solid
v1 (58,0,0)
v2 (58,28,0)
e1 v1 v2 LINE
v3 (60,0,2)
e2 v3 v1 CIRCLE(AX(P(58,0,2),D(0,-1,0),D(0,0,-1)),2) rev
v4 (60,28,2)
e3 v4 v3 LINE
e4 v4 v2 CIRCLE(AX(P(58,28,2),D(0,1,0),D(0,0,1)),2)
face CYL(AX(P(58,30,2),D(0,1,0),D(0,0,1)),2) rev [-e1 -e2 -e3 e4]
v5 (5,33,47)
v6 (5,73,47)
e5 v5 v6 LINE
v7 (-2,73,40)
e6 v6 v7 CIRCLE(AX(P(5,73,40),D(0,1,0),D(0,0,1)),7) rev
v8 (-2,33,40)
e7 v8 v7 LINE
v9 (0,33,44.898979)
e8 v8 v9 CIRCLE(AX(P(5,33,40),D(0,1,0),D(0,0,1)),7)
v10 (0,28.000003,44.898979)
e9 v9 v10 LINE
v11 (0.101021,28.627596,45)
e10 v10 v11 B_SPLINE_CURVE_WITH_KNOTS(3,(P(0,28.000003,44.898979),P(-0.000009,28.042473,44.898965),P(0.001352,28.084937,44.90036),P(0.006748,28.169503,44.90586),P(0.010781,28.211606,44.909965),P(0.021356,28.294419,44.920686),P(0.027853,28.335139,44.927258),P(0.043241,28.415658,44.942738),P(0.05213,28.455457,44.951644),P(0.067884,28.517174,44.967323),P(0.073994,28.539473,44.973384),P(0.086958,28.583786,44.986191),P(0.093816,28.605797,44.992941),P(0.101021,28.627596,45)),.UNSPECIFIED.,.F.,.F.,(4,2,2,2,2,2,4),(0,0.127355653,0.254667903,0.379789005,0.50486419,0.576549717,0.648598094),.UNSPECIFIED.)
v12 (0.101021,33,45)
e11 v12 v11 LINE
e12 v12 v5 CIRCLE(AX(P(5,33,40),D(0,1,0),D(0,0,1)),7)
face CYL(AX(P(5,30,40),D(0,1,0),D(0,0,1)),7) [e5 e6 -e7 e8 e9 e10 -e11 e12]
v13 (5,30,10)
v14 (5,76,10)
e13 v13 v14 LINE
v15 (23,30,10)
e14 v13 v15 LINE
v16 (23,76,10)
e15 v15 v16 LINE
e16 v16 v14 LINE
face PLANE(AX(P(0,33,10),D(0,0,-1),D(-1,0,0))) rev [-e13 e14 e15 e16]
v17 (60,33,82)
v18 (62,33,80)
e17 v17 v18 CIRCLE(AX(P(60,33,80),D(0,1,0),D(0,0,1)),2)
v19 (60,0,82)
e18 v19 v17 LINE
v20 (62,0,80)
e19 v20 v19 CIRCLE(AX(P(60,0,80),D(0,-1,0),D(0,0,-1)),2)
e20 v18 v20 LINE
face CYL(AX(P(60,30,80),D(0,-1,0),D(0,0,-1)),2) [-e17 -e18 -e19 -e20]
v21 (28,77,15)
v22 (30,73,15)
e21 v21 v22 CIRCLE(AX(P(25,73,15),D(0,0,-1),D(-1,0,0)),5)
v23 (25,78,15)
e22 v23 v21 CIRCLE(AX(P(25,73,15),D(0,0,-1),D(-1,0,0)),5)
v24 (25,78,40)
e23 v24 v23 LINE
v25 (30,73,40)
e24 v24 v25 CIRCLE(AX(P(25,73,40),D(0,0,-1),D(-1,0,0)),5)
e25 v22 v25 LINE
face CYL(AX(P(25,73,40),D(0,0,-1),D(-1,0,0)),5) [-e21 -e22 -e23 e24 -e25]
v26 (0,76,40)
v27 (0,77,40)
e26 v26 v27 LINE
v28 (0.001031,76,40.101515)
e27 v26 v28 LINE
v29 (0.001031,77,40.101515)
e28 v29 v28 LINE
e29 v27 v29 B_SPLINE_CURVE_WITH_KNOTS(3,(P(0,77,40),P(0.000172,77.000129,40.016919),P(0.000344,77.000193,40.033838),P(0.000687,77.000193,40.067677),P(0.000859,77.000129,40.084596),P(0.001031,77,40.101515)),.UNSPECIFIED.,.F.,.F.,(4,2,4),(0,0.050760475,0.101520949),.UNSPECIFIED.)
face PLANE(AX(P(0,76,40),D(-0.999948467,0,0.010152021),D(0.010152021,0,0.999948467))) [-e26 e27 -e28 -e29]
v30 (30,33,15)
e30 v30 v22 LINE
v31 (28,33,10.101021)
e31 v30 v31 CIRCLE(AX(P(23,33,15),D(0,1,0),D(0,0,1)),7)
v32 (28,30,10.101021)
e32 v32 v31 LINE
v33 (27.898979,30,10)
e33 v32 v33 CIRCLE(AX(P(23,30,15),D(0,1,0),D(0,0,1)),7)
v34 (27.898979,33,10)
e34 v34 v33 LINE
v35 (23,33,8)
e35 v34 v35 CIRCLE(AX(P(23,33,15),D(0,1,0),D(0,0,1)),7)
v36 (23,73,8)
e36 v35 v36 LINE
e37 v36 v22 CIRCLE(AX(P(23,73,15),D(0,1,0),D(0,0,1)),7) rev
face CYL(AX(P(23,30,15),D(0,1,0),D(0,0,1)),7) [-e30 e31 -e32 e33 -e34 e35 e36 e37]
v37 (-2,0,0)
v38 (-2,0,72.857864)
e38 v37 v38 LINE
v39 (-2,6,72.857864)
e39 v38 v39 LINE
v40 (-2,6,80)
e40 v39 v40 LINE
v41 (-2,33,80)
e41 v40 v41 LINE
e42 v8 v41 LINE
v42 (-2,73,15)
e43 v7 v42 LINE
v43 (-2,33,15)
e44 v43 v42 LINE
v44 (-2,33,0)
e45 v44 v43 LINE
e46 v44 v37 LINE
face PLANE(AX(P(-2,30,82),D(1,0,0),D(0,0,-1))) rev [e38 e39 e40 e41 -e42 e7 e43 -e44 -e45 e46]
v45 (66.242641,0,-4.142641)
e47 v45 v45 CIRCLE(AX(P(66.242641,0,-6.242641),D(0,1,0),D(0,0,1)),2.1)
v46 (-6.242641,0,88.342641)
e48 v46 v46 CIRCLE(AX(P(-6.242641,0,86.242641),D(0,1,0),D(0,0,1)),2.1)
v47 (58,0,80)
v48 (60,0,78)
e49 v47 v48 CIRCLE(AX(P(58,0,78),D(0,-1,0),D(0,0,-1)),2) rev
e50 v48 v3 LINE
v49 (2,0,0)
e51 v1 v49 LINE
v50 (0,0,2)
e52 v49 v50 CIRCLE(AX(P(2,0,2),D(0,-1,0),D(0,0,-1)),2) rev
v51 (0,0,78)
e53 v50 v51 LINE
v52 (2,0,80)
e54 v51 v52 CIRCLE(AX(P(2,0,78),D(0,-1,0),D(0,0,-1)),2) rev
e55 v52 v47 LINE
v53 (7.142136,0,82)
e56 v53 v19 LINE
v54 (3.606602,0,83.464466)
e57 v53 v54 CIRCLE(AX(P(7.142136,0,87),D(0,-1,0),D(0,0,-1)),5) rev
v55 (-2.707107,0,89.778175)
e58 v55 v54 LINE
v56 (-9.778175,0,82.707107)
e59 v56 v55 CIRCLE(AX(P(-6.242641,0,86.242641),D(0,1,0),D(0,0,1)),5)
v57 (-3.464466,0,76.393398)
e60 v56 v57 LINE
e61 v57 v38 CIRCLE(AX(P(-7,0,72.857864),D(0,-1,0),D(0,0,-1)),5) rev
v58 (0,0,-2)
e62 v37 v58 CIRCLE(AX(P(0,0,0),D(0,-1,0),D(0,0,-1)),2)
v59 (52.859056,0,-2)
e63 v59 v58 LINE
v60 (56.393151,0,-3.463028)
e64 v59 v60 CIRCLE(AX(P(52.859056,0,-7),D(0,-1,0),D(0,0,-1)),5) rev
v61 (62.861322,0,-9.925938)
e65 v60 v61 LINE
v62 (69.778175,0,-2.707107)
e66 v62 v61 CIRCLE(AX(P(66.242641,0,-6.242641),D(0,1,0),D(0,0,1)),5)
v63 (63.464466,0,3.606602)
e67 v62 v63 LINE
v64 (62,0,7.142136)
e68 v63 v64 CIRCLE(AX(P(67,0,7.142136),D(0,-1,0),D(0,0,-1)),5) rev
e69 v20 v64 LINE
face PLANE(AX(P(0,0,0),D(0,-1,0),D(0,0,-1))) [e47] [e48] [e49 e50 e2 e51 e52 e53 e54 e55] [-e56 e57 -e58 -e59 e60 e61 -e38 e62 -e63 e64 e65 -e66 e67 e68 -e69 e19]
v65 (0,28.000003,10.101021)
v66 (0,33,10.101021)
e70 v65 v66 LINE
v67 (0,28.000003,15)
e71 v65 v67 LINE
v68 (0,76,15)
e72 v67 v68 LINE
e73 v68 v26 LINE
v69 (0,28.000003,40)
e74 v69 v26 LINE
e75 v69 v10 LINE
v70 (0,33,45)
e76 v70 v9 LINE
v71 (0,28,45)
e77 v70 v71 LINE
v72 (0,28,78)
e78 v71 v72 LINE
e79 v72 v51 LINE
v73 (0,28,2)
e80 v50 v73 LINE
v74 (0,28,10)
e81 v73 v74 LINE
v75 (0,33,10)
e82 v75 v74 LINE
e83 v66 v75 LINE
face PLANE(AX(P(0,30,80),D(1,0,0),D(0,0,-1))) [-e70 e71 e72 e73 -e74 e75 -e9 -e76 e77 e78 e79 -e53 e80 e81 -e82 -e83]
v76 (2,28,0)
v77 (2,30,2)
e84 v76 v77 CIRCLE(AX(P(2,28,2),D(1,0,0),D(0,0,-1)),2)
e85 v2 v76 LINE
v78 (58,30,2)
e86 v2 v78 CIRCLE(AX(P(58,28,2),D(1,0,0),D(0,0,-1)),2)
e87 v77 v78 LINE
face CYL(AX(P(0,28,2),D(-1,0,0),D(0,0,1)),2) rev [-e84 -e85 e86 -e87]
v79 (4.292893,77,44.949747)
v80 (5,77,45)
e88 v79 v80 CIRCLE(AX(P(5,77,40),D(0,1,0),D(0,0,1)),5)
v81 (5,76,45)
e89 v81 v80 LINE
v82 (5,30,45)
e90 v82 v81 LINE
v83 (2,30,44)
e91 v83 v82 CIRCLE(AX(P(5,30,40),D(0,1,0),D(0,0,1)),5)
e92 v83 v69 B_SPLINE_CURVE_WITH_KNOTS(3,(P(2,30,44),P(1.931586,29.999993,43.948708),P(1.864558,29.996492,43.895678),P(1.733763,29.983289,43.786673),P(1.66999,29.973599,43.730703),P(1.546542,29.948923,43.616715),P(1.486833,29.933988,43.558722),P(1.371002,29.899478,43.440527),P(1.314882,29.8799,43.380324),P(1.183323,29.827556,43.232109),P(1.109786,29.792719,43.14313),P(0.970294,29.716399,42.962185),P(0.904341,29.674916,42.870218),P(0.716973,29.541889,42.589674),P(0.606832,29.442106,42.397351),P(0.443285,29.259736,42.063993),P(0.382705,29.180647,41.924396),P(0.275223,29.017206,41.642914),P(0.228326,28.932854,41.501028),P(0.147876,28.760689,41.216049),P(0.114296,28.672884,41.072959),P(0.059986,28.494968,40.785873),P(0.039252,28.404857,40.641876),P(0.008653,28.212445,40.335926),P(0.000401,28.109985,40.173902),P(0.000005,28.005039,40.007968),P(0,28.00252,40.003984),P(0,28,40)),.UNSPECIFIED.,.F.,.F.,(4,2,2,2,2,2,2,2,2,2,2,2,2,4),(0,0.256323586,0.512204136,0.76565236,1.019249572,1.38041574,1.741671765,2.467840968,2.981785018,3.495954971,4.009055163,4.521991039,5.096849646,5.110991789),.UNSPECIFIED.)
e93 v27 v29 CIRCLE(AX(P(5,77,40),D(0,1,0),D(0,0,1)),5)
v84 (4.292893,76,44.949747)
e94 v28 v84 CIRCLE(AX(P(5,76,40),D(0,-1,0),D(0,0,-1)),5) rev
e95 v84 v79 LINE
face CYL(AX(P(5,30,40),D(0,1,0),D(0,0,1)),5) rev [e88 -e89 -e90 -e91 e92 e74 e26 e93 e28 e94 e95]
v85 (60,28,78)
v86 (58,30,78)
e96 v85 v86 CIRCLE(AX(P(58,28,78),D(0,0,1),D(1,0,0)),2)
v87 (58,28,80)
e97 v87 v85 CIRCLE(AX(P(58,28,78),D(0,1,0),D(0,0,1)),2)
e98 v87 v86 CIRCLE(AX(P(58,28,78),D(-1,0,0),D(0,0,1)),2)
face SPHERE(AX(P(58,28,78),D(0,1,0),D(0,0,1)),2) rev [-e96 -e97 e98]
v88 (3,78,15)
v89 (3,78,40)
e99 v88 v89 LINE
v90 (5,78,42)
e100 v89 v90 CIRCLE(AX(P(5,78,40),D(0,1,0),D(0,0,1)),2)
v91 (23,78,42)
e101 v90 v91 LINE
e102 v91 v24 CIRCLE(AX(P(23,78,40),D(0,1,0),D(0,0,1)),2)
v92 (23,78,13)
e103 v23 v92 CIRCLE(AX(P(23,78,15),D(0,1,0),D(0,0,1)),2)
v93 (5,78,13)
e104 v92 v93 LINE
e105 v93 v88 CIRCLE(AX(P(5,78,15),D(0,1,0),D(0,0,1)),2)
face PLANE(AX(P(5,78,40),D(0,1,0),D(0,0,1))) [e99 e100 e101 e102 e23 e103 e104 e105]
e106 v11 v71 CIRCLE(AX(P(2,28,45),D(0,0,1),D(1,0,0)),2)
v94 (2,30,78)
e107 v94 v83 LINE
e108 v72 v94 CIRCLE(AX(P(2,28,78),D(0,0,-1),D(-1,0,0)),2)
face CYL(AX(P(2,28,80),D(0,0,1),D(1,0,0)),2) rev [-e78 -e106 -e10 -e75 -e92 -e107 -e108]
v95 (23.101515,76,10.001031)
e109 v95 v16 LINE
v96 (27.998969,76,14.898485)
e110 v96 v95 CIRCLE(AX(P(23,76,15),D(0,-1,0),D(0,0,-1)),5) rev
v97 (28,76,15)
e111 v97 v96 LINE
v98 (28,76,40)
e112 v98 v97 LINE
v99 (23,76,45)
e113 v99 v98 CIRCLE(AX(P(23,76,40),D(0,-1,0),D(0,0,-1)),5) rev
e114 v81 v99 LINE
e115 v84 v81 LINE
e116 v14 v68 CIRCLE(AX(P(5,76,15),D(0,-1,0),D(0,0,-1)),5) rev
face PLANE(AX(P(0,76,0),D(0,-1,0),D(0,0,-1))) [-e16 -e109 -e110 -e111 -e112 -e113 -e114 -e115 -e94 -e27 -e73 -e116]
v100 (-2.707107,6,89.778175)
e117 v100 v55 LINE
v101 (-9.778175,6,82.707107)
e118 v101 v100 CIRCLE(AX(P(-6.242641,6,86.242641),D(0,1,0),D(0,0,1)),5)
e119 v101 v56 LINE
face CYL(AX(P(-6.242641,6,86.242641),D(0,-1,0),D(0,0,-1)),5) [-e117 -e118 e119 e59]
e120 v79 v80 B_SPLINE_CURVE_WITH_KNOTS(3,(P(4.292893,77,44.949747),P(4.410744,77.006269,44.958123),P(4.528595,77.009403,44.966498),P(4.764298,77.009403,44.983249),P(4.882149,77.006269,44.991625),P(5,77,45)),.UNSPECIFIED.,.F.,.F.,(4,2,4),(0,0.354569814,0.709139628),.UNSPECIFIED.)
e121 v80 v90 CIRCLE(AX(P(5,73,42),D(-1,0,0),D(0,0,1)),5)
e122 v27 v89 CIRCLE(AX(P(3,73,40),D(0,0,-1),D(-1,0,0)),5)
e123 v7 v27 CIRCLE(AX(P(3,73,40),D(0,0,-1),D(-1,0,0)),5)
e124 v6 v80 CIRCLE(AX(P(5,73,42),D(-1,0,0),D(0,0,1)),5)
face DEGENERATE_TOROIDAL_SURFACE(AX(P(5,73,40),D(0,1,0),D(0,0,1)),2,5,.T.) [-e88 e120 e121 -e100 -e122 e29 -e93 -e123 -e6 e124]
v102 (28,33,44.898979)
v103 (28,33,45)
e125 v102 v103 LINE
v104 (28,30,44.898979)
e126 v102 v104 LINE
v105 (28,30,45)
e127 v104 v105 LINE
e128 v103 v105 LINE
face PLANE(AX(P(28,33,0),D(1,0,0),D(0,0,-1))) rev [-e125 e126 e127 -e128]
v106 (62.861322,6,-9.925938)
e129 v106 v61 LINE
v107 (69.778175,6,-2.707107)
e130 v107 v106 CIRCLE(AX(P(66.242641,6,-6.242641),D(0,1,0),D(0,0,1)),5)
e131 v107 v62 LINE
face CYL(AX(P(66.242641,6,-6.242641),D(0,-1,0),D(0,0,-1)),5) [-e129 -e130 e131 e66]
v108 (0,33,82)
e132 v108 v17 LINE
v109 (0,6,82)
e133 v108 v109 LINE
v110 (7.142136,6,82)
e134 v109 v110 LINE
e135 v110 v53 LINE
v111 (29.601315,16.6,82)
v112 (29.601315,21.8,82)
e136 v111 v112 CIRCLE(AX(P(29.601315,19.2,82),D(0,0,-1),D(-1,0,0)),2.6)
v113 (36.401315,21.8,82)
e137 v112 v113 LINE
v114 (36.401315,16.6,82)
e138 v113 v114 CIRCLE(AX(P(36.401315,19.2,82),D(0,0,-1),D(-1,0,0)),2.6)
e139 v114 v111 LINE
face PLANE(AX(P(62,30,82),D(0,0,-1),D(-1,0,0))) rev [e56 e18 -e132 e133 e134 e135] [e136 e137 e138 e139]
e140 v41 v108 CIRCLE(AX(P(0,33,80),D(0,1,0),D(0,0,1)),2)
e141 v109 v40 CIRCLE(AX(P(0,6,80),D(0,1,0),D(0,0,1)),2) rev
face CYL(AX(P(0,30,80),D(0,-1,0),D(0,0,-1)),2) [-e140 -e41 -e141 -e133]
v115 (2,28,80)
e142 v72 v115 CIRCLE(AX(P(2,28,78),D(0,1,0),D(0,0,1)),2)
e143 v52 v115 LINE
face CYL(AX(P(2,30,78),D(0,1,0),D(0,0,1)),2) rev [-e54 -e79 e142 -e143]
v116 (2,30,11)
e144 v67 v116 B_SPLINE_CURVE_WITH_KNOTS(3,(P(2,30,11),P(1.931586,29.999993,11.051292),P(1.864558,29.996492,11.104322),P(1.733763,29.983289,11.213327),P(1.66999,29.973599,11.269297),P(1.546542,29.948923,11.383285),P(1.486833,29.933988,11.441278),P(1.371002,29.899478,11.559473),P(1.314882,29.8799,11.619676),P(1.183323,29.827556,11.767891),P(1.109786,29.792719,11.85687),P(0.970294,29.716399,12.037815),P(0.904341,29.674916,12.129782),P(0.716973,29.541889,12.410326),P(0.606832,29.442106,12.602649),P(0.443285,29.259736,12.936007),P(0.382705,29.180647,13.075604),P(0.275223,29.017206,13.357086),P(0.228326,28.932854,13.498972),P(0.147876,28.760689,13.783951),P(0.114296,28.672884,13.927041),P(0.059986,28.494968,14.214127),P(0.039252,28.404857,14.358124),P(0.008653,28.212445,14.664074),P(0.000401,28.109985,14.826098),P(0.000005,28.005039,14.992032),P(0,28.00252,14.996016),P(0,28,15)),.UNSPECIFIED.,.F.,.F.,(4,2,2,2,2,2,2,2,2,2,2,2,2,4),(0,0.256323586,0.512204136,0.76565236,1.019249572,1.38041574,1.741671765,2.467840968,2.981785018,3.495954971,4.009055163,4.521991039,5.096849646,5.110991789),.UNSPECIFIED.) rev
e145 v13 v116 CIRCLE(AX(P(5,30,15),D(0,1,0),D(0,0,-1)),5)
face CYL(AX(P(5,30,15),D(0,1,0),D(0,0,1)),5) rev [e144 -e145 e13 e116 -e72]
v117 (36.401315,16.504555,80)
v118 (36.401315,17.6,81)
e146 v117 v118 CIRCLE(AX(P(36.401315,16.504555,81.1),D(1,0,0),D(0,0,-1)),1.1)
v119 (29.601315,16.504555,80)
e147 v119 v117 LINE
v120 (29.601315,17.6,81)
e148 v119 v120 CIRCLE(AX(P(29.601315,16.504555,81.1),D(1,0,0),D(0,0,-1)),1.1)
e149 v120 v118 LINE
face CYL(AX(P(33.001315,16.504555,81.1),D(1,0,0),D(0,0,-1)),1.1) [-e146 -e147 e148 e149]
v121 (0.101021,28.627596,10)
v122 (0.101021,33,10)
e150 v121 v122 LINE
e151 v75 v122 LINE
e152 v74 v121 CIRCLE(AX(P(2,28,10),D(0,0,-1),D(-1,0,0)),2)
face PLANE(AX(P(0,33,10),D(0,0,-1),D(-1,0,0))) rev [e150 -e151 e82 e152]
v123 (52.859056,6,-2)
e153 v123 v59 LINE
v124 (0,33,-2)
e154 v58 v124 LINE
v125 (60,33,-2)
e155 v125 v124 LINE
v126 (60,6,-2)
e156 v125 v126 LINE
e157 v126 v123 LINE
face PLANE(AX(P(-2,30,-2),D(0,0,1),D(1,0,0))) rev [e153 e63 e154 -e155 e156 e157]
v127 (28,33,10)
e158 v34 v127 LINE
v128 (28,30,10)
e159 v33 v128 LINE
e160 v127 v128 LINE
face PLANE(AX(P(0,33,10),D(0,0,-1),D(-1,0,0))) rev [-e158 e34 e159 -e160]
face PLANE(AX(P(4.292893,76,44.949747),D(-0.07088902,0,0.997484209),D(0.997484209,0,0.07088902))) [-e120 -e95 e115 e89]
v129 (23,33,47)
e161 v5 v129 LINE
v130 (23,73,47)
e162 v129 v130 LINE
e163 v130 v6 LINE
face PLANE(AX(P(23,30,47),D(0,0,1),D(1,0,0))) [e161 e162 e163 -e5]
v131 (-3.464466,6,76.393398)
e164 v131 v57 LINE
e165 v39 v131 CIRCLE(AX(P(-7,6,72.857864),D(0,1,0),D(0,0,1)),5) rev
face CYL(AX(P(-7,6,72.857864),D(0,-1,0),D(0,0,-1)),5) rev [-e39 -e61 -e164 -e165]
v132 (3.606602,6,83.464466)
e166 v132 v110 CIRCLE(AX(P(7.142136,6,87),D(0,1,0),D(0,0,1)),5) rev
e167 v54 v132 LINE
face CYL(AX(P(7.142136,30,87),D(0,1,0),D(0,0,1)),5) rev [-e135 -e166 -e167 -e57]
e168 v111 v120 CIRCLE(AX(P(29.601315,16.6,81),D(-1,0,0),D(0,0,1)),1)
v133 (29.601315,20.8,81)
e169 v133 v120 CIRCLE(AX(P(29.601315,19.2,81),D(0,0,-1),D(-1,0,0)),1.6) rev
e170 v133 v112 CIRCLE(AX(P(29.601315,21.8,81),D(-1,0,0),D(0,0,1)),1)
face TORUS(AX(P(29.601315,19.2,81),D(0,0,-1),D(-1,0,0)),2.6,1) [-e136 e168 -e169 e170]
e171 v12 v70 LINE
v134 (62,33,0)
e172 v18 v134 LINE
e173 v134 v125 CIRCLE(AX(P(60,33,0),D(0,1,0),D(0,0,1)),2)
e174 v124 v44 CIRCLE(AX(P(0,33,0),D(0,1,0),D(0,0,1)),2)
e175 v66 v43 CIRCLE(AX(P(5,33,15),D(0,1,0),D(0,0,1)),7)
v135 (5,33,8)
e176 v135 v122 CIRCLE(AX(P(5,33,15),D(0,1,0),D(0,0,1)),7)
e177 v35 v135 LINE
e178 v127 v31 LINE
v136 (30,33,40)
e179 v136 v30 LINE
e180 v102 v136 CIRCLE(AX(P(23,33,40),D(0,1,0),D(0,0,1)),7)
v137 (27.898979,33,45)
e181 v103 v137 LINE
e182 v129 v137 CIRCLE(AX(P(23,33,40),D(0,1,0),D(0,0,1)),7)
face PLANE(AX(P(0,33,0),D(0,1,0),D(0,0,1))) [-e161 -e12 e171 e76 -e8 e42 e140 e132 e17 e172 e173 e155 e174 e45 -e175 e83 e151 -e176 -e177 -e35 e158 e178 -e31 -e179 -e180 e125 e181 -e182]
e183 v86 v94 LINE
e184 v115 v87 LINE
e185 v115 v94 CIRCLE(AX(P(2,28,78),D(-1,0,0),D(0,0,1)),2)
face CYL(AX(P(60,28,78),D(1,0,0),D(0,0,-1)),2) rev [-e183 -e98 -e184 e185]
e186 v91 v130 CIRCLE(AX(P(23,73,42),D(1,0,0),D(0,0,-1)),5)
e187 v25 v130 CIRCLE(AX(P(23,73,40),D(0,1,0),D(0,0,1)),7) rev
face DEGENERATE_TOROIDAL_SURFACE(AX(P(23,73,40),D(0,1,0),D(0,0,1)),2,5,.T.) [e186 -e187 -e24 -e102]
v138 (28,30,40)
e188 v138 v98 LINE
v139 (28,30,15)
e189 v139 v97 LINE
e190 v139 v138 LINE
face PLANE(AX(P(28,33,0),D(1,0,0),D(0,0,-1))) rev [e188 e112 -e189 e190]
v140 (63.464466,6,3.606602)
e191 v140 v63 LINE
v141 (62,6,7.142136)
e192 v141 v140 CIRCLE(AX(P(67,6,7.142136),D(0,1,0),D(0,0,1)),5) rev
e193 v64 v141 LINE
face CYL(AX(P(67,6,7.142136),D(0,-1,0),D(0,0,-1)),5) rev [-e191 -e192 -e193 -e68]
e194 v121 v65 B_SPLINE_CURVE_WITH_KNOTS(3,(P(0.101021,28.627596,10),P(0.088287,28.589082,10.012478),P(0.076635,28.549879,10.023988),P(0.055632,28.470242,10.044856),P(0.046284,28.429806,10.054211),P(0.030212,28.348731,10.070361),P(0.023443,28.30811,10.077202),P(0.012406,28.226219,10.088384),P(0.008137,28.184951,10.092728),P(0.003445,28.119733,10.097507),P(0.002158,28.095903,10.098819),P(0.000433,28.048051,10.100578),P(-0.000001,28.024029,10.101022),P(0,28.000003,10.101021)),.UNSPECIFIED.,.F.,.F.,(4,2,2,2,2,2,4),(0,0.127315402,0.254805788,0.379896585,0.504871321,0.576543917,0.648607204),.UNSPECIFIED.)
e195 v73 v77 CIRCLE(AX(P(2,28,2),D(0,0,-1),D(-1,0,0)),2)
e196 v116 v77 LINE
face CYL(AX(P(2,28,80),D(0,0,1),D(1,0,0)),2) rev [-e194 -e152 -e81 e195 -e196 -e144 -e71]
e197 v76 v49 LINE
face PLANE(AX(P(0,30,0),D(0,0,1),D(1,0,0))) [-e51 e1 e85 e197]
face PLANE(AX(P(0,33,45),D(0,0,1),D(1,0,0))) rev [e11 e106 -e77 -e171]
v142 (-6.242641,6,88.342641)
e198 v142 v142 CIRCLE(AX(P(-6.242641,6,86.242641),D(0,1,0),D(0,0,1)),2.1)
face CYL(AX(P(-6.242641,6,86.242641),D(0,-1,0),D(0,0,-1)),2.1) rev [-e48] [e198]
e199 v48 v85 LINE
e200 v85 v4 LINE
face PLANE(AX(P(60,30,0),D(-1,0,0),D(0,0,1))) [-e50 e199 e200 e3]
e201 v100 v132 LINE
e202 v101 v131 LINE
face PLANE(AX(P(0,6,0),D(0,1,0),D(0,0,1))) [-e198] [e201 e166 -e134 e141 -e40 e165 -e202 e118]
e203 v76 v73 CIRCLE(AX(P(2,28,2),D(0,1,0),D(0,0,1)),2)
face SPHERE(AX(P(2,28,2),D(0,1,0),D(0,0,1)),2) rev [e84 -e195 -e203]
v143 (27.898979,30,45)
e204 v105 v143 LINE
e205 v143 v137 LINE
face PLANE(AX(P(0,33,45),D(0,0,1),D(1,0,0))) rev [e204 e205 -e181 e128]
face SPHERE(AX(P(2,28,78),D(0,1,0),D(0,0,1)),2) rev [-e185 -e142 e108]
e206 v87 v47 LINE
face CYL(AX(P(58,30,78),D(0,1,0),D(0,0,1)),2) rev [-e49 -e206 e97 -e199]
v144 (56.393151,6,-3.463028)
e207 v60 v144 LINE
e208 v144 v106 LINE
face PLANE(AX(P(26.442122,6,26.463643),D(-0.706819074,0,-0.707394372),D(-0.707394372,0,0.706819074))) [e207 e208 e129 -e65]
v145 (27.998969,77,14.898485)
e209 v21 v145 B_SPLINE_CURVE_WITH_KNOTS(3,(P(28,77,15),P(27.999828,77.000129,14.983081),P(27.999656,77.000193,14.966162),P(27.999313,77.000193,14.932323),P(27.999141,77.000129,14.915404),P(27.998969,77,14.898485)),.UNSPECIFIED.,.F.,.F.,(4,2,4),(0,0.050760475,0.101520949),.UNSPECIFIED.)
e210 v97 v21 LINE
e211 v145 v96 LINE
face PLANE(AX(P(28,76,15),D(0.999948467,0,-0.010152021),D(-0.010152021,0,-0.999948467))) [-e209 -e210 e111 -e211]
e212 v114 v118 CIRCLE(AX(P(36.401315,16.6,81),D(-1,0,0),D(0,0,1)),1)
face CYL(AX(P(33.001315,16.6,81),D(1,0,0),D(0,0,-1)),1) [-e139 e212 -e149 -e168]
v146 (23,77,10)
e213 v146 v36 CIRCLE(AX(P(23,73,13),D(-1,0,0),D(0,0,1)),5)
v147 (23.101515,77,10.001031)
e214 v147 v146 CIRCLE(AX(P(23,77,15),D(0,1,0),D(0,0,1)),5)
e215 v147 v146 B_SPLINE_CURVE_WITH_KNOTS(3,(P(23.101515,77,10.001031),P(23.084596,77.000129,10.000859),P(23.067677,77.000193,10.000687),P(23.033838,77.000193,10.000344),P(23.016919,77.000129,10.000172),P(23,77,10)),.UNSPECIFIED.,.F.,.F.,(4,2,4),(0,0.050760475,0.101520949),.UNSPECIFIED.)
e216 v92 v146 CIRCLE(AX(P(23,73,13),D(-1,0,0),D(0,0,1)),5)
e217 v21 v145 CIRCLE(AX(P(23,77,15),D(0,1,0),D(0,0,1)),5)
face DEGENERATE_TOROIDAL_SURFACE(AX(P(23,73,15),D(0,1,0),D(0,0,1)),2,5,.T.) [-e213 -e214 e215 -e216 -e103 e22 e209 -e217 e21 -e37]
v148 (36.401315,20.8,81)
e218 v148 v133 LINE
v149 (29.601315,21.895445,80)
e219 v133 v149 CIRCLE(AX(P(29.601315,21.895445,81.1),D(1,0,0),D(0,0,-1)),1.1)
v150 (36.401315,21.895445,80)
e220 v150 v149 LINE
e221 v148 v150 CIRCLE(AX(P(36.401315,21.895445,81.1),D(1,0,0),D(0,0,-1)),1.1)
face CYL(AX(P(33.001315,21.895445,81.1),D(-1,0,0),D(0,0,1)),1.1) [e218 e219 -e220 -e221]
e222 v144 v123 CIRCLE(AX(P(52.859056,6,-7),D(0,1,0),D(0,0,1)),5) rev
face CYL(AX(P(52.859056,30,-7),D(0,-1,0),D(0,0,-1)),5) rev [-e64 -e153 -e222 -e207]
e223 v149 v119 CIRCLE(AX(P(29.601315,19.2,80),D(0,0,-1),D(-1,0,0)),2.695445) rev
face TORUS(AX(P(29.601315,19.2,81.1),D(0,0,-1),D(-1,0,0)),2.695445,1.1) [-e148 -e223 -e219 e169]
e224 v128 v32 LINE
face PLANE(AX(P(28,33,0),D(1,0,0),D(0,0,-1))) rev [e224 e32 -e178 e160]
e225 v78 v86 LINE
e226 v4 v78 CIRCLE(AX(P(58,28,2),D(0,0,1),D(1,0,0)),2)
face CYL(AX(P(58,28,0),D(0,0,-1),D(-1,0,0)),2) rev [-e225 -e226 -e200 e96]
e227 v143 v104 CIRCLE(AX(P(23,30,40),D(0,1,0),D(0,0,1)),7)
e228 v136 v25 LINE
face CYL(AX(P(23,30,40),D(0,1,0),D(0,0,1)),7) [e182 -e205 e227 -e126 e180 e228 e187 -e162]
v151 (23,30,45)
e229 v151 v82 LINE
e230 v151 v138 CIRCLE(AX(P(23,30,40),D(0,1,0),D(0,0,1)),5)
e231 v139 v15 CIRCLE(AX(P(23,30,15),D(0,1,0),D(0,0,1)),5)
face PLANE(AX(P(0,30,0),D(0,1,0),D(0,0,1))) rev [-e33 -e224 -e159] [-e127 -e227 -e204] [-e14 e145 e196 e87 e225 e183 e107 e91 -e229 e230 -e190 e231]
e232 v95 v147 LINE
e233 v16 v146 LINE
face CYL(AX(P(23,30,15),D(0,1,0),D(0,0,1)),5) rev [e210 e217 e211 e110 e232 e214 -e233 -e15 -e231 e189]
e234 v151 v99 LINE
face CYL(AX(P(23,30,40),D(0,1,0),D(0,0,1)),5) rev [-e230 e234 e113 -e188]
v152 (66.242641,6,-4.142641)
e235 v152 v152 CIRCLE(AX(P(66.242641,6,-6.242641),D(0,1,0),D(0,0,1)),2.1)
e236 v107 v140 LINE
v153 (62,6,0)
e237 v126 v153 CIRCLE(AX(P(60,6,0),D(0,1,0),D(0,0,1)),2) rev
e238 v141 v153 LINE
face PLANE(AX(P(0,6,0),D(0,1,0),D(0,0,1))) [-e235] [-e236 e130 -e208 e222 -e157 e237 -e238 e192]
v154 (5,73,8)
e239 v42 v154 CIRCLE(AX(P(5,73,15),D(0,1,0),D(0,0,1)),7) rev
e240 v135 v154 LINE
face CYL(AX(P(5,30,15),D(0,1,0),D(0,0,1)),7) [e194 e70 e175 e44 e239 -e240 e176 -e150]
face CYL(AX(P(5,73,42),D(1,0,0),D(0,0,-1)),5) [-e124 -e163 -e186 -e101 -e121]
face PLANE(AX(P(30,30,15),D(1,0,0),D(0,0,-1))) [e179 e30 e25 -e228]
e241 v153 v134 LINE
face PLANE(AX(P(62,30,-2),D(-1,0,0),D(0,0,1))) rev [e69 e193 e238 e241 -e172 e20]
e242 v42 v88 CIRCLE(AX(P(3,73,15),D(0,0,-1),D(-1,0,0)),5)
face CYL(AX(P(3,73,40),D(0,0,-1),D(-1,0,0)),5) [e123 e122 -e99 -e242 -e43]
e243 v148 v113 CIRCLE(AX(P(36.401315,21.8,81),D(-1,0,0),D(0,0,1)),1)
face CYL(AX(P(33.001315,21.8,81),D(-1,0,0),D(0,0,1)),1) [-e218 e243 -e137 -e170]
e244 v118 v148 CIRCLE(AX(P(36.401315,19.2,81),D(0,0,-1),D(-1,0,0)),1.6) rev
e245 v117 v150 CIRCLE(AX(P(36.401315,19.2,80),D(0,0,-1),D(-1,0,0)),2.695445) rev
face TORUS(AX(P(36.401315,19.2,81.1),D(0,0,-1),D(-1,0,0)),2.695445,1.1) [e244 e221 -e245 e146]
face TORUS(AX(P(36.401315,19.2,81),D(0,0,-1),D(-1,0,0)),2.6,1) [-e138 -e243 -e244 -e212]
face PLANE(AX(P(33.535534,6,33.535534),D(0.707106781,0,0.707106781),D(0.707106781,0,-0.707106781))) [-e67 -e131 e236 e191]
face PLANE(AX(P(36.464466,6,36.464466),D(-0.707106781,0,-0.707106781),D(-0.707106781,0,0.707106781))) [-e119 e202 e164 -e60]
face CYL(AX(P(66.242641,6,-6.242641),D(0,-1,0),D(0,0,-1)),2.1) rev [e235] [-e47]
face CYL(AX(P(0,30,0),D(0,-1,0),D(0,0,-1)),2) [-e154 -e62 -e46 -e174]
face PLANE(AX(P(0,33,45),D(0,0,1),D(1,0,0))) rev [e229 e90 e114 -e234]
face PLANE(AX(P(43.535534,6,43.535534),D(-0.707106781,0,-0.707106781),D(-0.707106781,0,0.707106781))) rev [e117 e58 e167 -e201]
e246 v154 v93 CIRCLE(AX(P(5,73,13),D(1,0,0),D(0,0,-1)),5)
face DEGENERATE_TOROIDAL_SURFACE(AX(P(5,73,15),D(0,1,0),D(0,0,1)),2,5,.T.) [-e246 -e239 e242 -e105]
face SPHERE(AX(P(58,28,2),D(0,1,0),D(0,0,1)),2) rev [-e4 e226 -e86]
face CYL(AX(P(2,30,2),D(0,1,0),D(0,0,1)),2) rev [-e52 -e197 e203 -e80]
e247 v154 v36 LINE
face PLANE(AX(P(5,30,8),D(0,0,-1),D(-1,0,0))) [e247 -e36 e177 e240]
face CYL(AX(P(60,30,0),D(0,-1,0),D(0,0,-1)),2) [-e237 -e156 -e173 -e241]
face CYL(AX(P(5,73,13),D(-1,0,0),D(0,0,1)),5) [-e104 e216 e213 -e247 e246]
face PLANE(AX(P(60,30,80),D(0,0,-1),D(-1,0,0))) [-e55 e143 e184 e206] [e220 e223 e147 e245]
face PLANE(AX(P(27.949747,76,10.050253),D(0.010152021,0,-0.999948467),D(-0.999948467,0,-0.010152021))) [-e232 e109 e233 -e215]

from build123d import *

# Parameters (mm, degrees)
SKETCH1_W                = 64
SKETCH1_H                = 84
SKETCH1_W_2              = 60
SKETCH1_H_2              = 80
BOSS_EXTRUDE1_DEPTH      = 30
SKETCH2_R                = 2.1
BOSS_EXTRUDE2_DEPTH      = 6
CUT_EXTRUDE1_DEPTH       = 30
FILLET2_R                = 1
FILLET7_R                = 2
FILLET8_R                = 1.1
FILLET9_R                = 5
BOSS_EXTRUDE3_START      = 3
SKETCH5_W                = 2
SKETCH5_H                = 35
BOSS_EXTRUDE3_DEPTH      = 3
BOSS_EXTRUDE4_DEPTH      = 45
BOSS_EXTRUDE4_DEPTH_BACK = 3
BOSS_EXTRUDE6_DEPTH      = 2
FILLET11_R               = 5
FILLET12_R               = 2


with BuildPart() as part:
    # Sketch1 → Boss-Extrude1 (new body)
    with BuildSketch(Plane(origin=(0, 0, 0), x_dir=(1, 0, 0), z_dir=(0, 1, 0))):
        with Locations((30, -40)):
            Rectangle(SKETCH1_W, SKETCH1_H)
        with Locations((30, -40)):
            Rectangle(SKETCH1_W_2, SKETCH1_H_2, mode=Mode.SUBTRACT)
    extrude(amount=BOSS_EXTRUDE1_DEPTH)

    # Sketch2 → Boss-Extrude2 (add)
    # profile 1 of 8: a face of its own
    with BuildSketch(Plane(origin=(0, 0, 0), x_dir=(1, 0, 0), z_dir=(0, 1, 0))):
        with BuildLine():
            ThreePointArc((-9.778174593, -82.707106781), (-9.778174593, -89.778174593), (-2.707106781, -89.778174593))
            Line((-2.707106781, -89.778174593), (-2.707106781, -82.707106781))
            Line((-2.707106781, -82.707106781), (-9.778174593, -82.707106781))
        make_face()
        with Locations(Location((-6.242640687, -86.242640687, 0), (0, 0, 270))):
            Circle(SKETCH2_R, mode=Mode.SUBTRACT)
    # profile 2 of 8: a face of its own
    with BuildSketch(Plane(origin=(0, 0, 0), x_dir=(1, 0, 0), z_dir=(0, 1, 0))):
        with BuildLine():
            ThreePointArc((-1.242640687, -86.242640687), (-1.623243025, -88.156057849), (-2.707106781, -89.778174593))
            Line((-2.707106781, -89.778174593), (5.071067812, -82))
            Line((5.071067812, -82), (0, -80))
            Line((0, -80), (-2, -74.928932188))
            Line((-2, -74.928932188), (-9.778174593, -82.707106781))
            ThreePointArc((-9.778174593, -82.707106781), (-6.242640687, -81.242640687), (-2.707106781, -82.707106781))
            ThreePointArc((-2.707106781, -82.707106781), (-1.623243025, -84.329223525), (-1.242640687, -86.242640687))
        make_face()
    # profile 3 of 8: a face of its own
    with BuildSketch(Plane(origin=(0, 0, 0), x_dir=(1, 0, 0), z_dir=(0, 1, 0))):
        with BuildLine():
            Line((-2.707106781, -82.707106781), (-2.707106781, -89.778174593))
            ThreePointArc((-2.707106781, -89.778174593), (-1.623243025, -88.156057849), (-1.242640687, -86.242640687))
            ThreePointArc((-1.242640687, -86.242640687), (-1.623243025, -84.329223525), (-2.707106781, -82.707106781))
        make_face()
    # profile 4 of 8: a face of its own
    with BuildSketch(Plane(origin=(0, 0, 0), x_dir=(1, 0, 0), z_dir=(0, 1, 0))):
        with BuildLine():
            Line((-9.778174593, -82.707106781), (-2.707106781, -82.707106781))
            ThreePointArc((-2.707106781, -82.707106781), (-6.242640687, -81.242640687), (-9.778174593, -82.707106781))
        make_face()
    # profile 5 of 8: a face of its own
    with BuildSketch(Plane(origin=(0, 0, 0), x_dir=(1, 0, 0), z_dir=(0, 1, 0))):
        with BuildLine():
            Line((62, -5.071067812), (69.778174593, 2.707106781))
            ThreePointArc((69.778174593, 2.707106781), (66.242640687, 1.242640687), (62.707106781, 2.707106781))
            ThreePointArc((62.707106781, 2.707106781), (61.243738197, 6.137884352), (62.562095354, 9.626955397))
            Line((62.562095354, 9.626955397), (54.928932188, 2))
            Line((54.928932188, 2), (60, 0))
            Line((60, 0), (62, -5.071067812))
        make_face()
    # profile 6 of 8: a face of its own
    with BuildSketch(Plane(origin=(0, 0, 0), x_dir=(1, 0, 0), z_dir=(0, 1, 0))):
        with BuildLine():
            ThreePointArc((62.707106781, 2.707106781), (66.242640687, 1.242640687), (69.778174593, 2.707106781))
            Line((69.778174593, 2.707106781), (62.707106781, 2.707106781))
        make_face()
    # profile 7 of 8: a face of its own
    with BuildSketch(Plane(origin=(0, 0, 0), x_dir=(1, 0, 0), z_dir=(0, 1, 0))):
        with BuildLine():
            ThreePointArc((62.562095354, 9.626955397), (61.243738197, 6.137884352), (62.707106781, 2.707106781))
            Line((62.707106781, 2.707106781), (62.861321566, 9.925938259))
            Line((62.861321566, 9.925938259), (62.562095354, 9.626955397))
        make_face()
    # profile 8 of 8: a face of its own
    with BuildSketch(Plane(origin=(0, 0, 0), x_dir=(1, 0, 0), z_dir=(0, 1, 0))):
        with BuildLine():
            Line((62.707106781, 2.707106781), (69.778174593, 2.707106781))
            ThreePointArc((69.778174593, 2.707106781), (70.86203835, 4.329223525), (71.242640687, 6.242640687))
            ThreePointArc((71.242640687, 6.242640687), (68.254282354, 10.820117918), (62.861321566, 9.925938259))
            Line((62.861321566, 9.925938259), (62.707106781, 2.707106781))
        make_face()
        with Locations(Location((66.242640687, 6.242640687, 0), (0, 0, 270))):
            Circle(SKETCH2_R, mode=Mode.SUBTRACT)
    extrude(amount=BOSS_EXTRUDE2_DEPTH)

    # Sketch4 → Cut-Extrude1 (cut)
    with BuildSketch(Plane.XY.offset(82)):
        with BuildLine():
            Line((33.001314869, 20.8), (29.601314869, 20.8))
            ThreePointArc((29.601314869, 20.8), (28.001314869, 19.2), (29.601314869, 17.6))
            Line((29.601314869, 17.6), (33.001314869, 17.6))
            Line((33.001314869, 17.6), (36.401314869, 17.6))
            ThreePointArc((36.401314869, 17.6), (38.001314869, 19.2), (36.401314869, 20.8))
            Line((36.401314869, 20.8), (33.001314869, 20.8))
        make_face()
    extrude(amount=-CUT_EXTRUDE1_DEPTH, mode=Mode.SUBTRACT)

    # Fillet2
    fillet2_edges = [part.edges().sort_by_distance(p)[0] for p in [
        (33.001314869, 17.6, 82),
        (38.001314869, 19.2, 82),
        (33.001314869, 20.8, 82),
        (28.001314869, 19.2, 82),
    ]]
    fillet(fillet2_edges, radius=FILLET2_R)

    # Fillet7
    fillet7_edges = [part.edges().sort_by_distance(p)[0] for p in [
        (0, 15, 0),
        (0, 15, 80),
        (60, 15, 80),
        (60, 15, 0),
        (-2, 18, 82),
        (-2, 15, -2),
        (62, 18, -2),
        (62, 15, 82),
    ]]
    fillet(fillet7_edges, radius=FILLET7_R)

    # Fillet8
    # the kernel refuses this fillet: 1.1 mm, written as the material it takes off along each edge
    with BuildSketch(Plane(origin=(36.401314869, 19.2, 80), x_dir=(0, -1, 0), z_dir=(-1, 0, 0))) as fillet8_piece_1:
        with BuildLine():
            CenterArc((2.695445115, 1.1), FILLET8_R, 185.21590857, 84.78409143)
            Line((1.6, 1), (1.6, 0))
            Line((1.6, 0), (2.695445115, 0))
        make_face()
    revolve(axis=Axis((36.401314869, 19.2, 80), (0, 0, 1)), revolution_arc=180, mode=Mode.SUBTRACT)
    with BuildSketch(Plane(origin=(36.401314869, 20.8, 80), x_dir=(0, 1, 0), z_dir=(-1, 0, 0)), Plane(origin=(29.601314869, 17.6, 80), x_dir=(0, -1, 0), z_dir=(1, 0, 0))) as fillet8_piece_2:
        with BuildLine():
            CenterArc((1.095445115, -1.1), FILLET8_R, 90, 84.78409143)
            Line((0, -1), (0, 0))
            Line((0, 0), (1.095445115, 0))
        make_face()
    extrude(amount=6.8, mode=Mode.SUBTRACT)
    with BuildSketch(Plane(origin=(29.601314869, 19.2, 80), x_dir=(0, 1, 0), z_dir=(1, 0, 0))) as fillet8_piece_3:
        with BuildLine():
            CenterArc((2.695445115, 1.1), FILLET8_R, 185.21590857, 84.78409143)
            Line((1.6, 1), (1.6, 0))
            Line((1.6, 0), (2.695445115, 0))
        make_face()
    revolve(axis=Axis((29.601314869, 19.2, 80), (0, 0, 1)), revolution_arc=180, mode=Mode.SUBTRACT)

    # Fillet9
    fillet9_edges = [part.edges().sort_by_distance(p)[0] for p in [
        (-2, 3, 74.928932188),
        (5.071067812, 3, 82),
        (62, 3, 5.071067812),
        (54.928932188, 3, -2),
    ]]
    fillet(fillet9_edges, radius=FILLET9_R)

    # Sketch5 → Boss-Extrude3 (add)
    with BuildSketch(Plane(origin=(0, 30, 0), x_dir=(1, 0, 0), z_dir=(0, 1, 0)).offset(BOSS_EXTRUDE3_START)):
        with Locations((-1, -27.5)):
            Rectangle(SKETCH5_W, SKETCH5_H)
        with BuildLine():
            Line((28, -45), (0, -45))
            Line((0, -45), (0, -78))
            ThreePointArc((0, -78), (0.585786438, -79.414213562), (2, -80))
            Line((2, -80), (58, -80))
            ThreePointArc((58, -80), (59.414213562, -79.414213562), (60, -78))
            Line((60, -78), (60, -2))
            ThreePointArc((60, -2), (59.414213562, -0.585786438), (58, 0))
            Line((58, 0), (2, 0))
            ThreePointArc((2, 0), (0.585786438, -0.585786438), (0, -2))
            Line((0, -2), (0, -10))
            Line((0, -10), (28, -10))
            Line((28, -10), (28, -45))
        make_face()
        with BuildLine():
            Line((0, -45), (-2, -45))
            Line((-2, -45), (-2, -80))
            ThreePointArc((-2, -80), (-1.414213562, -81.414213562), (0, -82))
            Line((0, -82), (60, -82))
            ThreePointArc((60, -82), (61.414213562, -81.414213562), (62, -80))
            Line((62, -80), (62, 0))
            ThreePointArc((62, 0), (61.414213562, 1.414213562), (60, 2))
            Line((60, 2), (0, 2))
            ThreePointArc((0, 2), (-1.414213562, 1.414213562), (-2, 0))
            Line((-2, 0), (-2, -10))
            Line((-2, -10), (0, -10))
            Line((0, -10), (0, -2))
            ThreePointArc((0, -2), (0.585786438, -0.585786438), (2, 0))
            Line((2, 0), (58, 0))
            ThreePointArc((58, 0), (59.414213562, -0.585786438), (60, -2))
            Line((60, -2), (60, -78))
            ThreePointArc((60, -78), (59.414213562, -79.414213562), (58, -80))
            Line((58, -80), (2, -80))
            ThreePointArc((2, -80), (0.585786438, -79.414213562), (0, -78))
            Line((0, -78), (0, -45))
        make_face()
    extrude(amount=-BOSS_EXTRUDE3_DEPTH)

    # Sketch6 → Boss-Extrude4 (add, two sides: drawn at the far end of the back side and taken through both)
    with BuildSketch(Plane(origin=(0, 33, 0), x_dir=(1, 0, 0), z_dir=(0, 1, 0)).offset(-BOSS_EXTRUDE4_DEPTH_BACK)):
        with BuildLine():
            Line((-2, -40), (-2, -15))
            ThreePointArc((-2, -15), (0.050252532, -10.050252532), (5, -8))
            Line((5, -8), (14, -8))
            Line((14, -8), (23, -8))
            ThreePointArc((23, -8), (27.949747468, -10.050252532), (30, -15))
            Line((30, -15), (30, -40))
            ThreePointArc((30, -40), (27.949747468, -44.949747468), (23, -47))
            Line((23, -47), (14, -47))
            Line((14, -47), (5, -47))
            ThreePointArc((5, -47), (0.050252532, -44.949747468), (-2, -40))
        make_face()
        with BuildLine():
            Line((5, -10), (14, -10))
            Line((14, -10), (23, -10))
            ThreePointArc((23, -10), (26.535533906, -11.464466094), (28, -15))
            Line((28, -15), (28, -40))
            ThreePointArc((28, -40), (26.535533906, -43.535533906), (23, -45))
            Line((23, -45), (14, -45))
            Line((14, -45), (5, -45))
            ThreePointArc((5, -45), (1.464466094, -43.535533906), (0, -40))
            Line((0, -40), (0, -15))
            ThreePointArc((0, -15), (1.464466094, -11.464466094), (5, -10))
        make_face(mode=Mode.SUBTRACT)
    extrude(amount=BOSS_EXTRUDE4_DEPTH + BOSS_EXTRUDE4_DEPTH_BACK)

    # Sketch7 → Boss-Extrude6 (add)
    with BuildSketch(Plane(origin=(0, 78, 0), x_dir=(1, 0, 0), z_dir=(0, 1, 0))):
        Polygon((0, -15), (0, -40), (0.050252532, -44.949747468), (4.292893219, -44.949747468), (5, -45), (23, -45), (25.012302519, -45), (26.626096331, -43.896174296), (28, -42.956432073), (28, -40), (28, -15), (27.949747468, -10.050252532), (23, -10), (5, -10), (3.904127918, -9.641868727), (2.415865255, -9.84051764), (1.161892949, -10.698227499), (0.397822666, -11.748824139), (-0.232535318, -13.257862949), align=None)
    extrude(amount=-BOSS_EXTRUDE6_DEPTH)

    # Fillet11
    # the kernel refuses this fillet: 5 mm, written as the material it takes off along each edge
    with BuildSketch(Plane(origin=(5, 78, 40), x_dir=(-0.7071067811865479, 0, 0.7071067811865472), z_dir=(0.7071067811865472, 0, 0.7071067811865479))) as fillet11_piece_1:
        with BuildLine():
            CenterArc((7 - FILLET11_R, FILLET11_R), FILLET11_R, 270, 90)
            Line((7 - FILLET11_R, 0), (7, 0))
            Line((7, 0), (7, FILLET11_R))
        make_face()
    revolve(axis=Axis((5, 78, 40), (0, -1, 0)), revolution_arc=45, mode=Mode.SUBTRACT)
    with BuildSketch(Plane(origin=(23, 78, 47), x_dir=(0, -1, 0), z_dir=(-1, 0, 0)), Plane(origin=(5, 78, 8), x_dir=(0, -1, 0), z_dir=(1, 0, 0))) as fillet11_piece_2:
        with BuildLine():
            CenterArc((FILLET11_R, -FILLET11_R), FILLET11_R, 90, 90)
            Line((0, -FILLET11_R), (0, 0))
            Line((0, 0), (FILLET11_R, 0))
        make_face()
    extrude(amount=18, mode=Mode.SUBTRACT)
    with BuildSketch(Plane(origin=(23, 78, 40), x_dir=(1, 0, 0), z_dir=(0, 0, -1))) as fillet11_piece_3:
        with BuildLine():
            CenterArc((7 - FILLET11_R, FILLET11_R), FILLET11_R, 270, 90)
            Line((7 - FILLET11_R, 0), (7, 0))
            Line((7, 0), (7, FILLET11_R))
        make_face()
    revolve(axis=Axis((23, 78, 40), (0, -1, 0)), revolution_arc=90, mode=Mode.SUBTRACT)
    with BuildSketch(Plane(origin=(30, 78, 15), x_dir=(0, -1, 0), z_dir=(0, 0, 1)), Plane(origin=(-2, 78, 40), x_dir=(0, -1, 0), z_dir=(0, 0, -1))) as fillet11_piece_4:
        with BuildLine():
            CenterArc((FILLET11_R, -FILLET11_R), FILLET11_R, 90, 90)
            Line((0, -FILLET11_R), (0, 0))
            Line((0, 0), (FILLET11_R, 0))
        make_face()
    extrude(amount=25, mode=Mode.SUBTRACT)
    with BuildSketch(Plane(origin=(23, 78, 15), x_dir=(0, 0, -1), z_dir=(-1, 0, 0))) as fillet11_piece_5:
        with BuildLine():
            CenterArc((7 - FILLET11_R, FILLET11_R), FILLET11_R, 270, 90)
            Line((7 - FILLET11_R, 0), (7, 0))
            Line((7, 0), (7, FILLET11_R))
        make_face()
    revolve(axis=Axis((23, 78, 15), (0, -1, 0)), revolution_arc=45, mode=Mode.SUBTRACT)
    with BuildSketch(Plane(origin=(5, 78, 15), x_dir=(-1, 0, 0), z_dir=(0, 0, 1))) as fillet11_piece_6:
        with BuildLine():
            CenterArc((7 - FILLET11_R, FILLET11_R), FILLET11_R, 270, 90)
            Line((7 - FILLET11_R, 0), (7, 0))
            Line((7, 0), (7, FILLET11_R))
        make_face()
    revolve(axis=Axis((5, 78, 15), (0, -1, 0)), revolution_arc=90, mode=Mode.SUBTRACT)
    with BuildSketch(Plane(origin=(23, 78, 15), x_dir=(0.7071067811865481, 0, -0.7071067811865471), z_dir=(-0.7071067811865471, 0, -0.7071067811865481))) as fillet11_piece_7:
        with BuildLine():
            CenterArc((7 - FILLET11_R, FILLET11_R), FILLET11_R, 270, 90)
            Line((7 - FILLET11_R, 0), (7, 0))
            Line((7, 0), (7, FILLET11_R))
        make_face()
    revolve(axis=Axis((23, 78, 15), (0, -1, 0)), revolution_arc=45, mode=Mode.SUBTRACT)
    with BuildSketch(Plane(origin=(5, 78, 40), x_dir=(0, 0, 1), z_dir=(1, 0, 0))) as fillet11_piece_8:
        with BuildLine():
            CenterArc((7 - FILLET11_R, FILLET11_R), FILLET11_R, 270, 90)
            Line((7 - FILLET11_R, 0), (7, 0))
            Line((7, 0), (7, FILLET11_R))
        make_face()
    revolve(axis=Axis((5, 78, 40), (0, -1, 0)), revolution_arc=45, mode=Mode.SUBTRACT)

    # Fillet12
    # the kernel refuses this fillet: 2 mm, written as the material it adds along each edge
    with BuildSketch(Plane(origin=(0, 30, 15), x_dir=(0, -1, 0), z_dir=(0, 0, -1))) as fillet12_piece_1_section:
        with BuildLine():
            CenterArc((FILLET12_R, -FILLET12_R), FILLET12_R, 90, 90)
            Line((0, -FILLET12_R), (0, 0))
            Line((0, 0), (FILLET12_R, 0))
        make_face()
    fillet12_piece_1 = extrude(amount=13, mode=Mode.PRIVATE)
    fillet12_piece_1 = split(fillet12_piece_1, bisect_by=Plane(origin=(0, 30, 10), z_dir=(0, 0, 1)), keep=Keep.TOP, mode=Mode.PRIVATE)
    fillet12_piece_1 = fillet12_piece_1 & Plane(origin=(5, 30, 15), x_dir=(-1, 0, 0), z_dir=(0, -1, 0)) * Cylinder(7, 35, mode=Mode.PRIVATE)
    fillet12_piece_1 = fillet12_piece_1 - Plane(origin=(5, 30, 15), x_dir=(-1, 0, 0), z_dir=(0, -1, 0)) * Cylinder(5, 35, mode=Mode.PRIVATE)
    add(fillet12_piece_1)
    with BuildSketch(Plane(origin=(0, 30, 10), x_dir=(0, -1, 0), z_dir=(0, 0, -1))) as fillet12_piece_2_section:
        with BuildLine():
            CenterArc((FILLET12_R, -FILLET12_R), FILLET12_R, 90, 90)
            Line((0, -FILLET12_R), (0, 0))
            Line((0, 0), (FILLET12_R, 0))
        make_face()
    fillet12_piece_2 = extrude(amount=8, mode=Mode.PRIVATE)
    fillet12_piece_2 = fillet12_piece_2 & Plane(origin=(5, 30, 15), x_dir=(-1, 0, 0), z_dir=(0, -1, 0)) * Cylinder(7, 25, mode=Mode.PRIVATE)
    add(fillet12_piece_2)
    with BuildSketch(Plane(origin=(0, 30, 10), x_dir=(0, -1, 0), z_dir=(0, 0, -1))) as fillet12_piece_3_section:
        with BuildLine():
            CenterArc((FILLET12_R, -FILLET12_R), FILLET12_R, 90, 90)
            Line((0, -FILLET12_R), (0, 0))
            Line((0, 0), (FILLET12_R, 0))
        make_face()
    fillet12_piece_3 = extrude(amount=8, mode=Mode.PRIVATE)
    fillet12_piece_3 = fillet12_piece_3 - Plane(origin=(5, 30, 15), x_dir=(-1, 0, 0), z_dir=(0, -1, 0)) * Cylinder(7, 25, mode=Mode.PRIVATE)
    add(fillet12_piece_3)
    with BuildSketch(Plane(origin=(2, 30, 2), x_dir=(0, 0, -1), z_dir=(1, 0, 0))) as fillet12_piece_4:
        with BuildLine():
            CenterArc((2 - FILLET12_R, -FILLET12_R), FILLET12_R, 0, 90)
            Line((2 - FILLET12_R, 0), (2, 0))
            Line((2, 0), (2, -FILLET12_R))
        make_face()
    revolve(axis=Axis((2, 30, 2), (0, 1, 0)), revolution_arc=90)
    with BuildSketch(Plane(origin=(2, 30, 0), x_dir=(0, -1, 0), z_dir=(1, 0, 0)), Plane(origin=(58, 30, 80), x_dir=(0, -1, 0), z_dir=(-1, 0, 0))) as fillet12_piece_5:
        with BuildLine():
            CenterArc((FILLET12_R, -FILLET12_R), FILLET12_R, 90, 90)
            Line((0, -FILLET12_R), (0, 0))
            Line((0, 0), (FILLET12_R, 0))
        make_face()
    extrude(amount=56)
    with BuildSketch(Plane(origin=(58, 30, 2), x_dir=(1, 0, 0), z_dir=(0, 0, 1))) as fillet12_piece_6:
        with BuildLine():
            CenterArc((2 - FILLET12_R, -FILLET12_R), FILLET12_R, 0, 90)
            Line((2 - FILLET12_R, 0), (2, 0))
            Line((2, 0), (2, -FILLET12_R))
        make_face()
    revolve(axis=Axis((58, 30, 2), (0, 1, 0)), revolution_arc=90)
    with BuildSketch(Plane(origin=(60, 30, 2), x_dir=(0, -1, 0), z_dir=(0, 0, 1))) as fillet12_piece_7:
        with BuildLine():
            CenterArc((FILLET12_R, -FILLET12_R), FILLET12_R, 90, 90)
            Line((0, -FILLET12_R), (0, 0))
            Line((0, 0), (FILLET12_R, 0))
        make_face()
    extrude(amount=76)
    with BuildSketch(Plane(origin=(58, 30, 78), x_dir=(1, 0, 0), z_dir=(0, 0, -1))) as fillet12_piece_8:
        with BuildLine():
            CenterArc((2 - FILLET12_R, FILLET12_R), FILLET12_R, 270, 90)
            Line((2 - FILLET12_R, 0), (2, 0))
            Line((2, 0), (2, FILLET12_R))
        make_face()
    revolve(axis=Axis((58, 30, 78), (0, -1, 0)), revolution_arc=90)
    with BuildSketch(Plane(origin=(2, 30, 78), x_dir=(-1, 0, 0), z_dir=(0, 0, -1))) as fillet12_piece_9:
        with BuildLine():
            CenterArc((2 - FILLET12_R, -FILLET12_R), FILLET12_R, 0, 90)
            Line((2 - FILLET12_R, 0), (2, 0))
            Line((2, 0), (2, -FILLET12_R))
        make_face()
    revolve(axis=Axis((2, 30, 78), (0, 1, 0)), revolution_arc=90)
    with BuildSketch(Plane(origin=(0, 30, 78), x_dir=(0, -1, 0), z_dir=(0, 0, -1))) as fillet12_piece_10_section:
        with BuildLine():
            CenterArc((FILLET12_R, -FILLET12_R), FILLET12_R, 90, 90)
            Line((0, -FILLET12_R), (0, 0))
            Line((0, 0), (FILLET12_R, 0))
        make_face()
    fillet12_piece_10 = extrude(amount=33, mode=Mode.PRIVATE)
    fillet12_piece_10 = fillet12_piece_10 - Plane(origin=(5, 30, 40), x_dir=(0, 0, 1), z_dir=(0, -1, 0)) * Cylinder(7, 74, mode=Mode.PRIVATE)
    add(fillet12_piece_10)
    with BuildSketch(Plane(origin=(0, 30, 78), x_dir=(0, -1, 0), z_dir=(0, 0, -1))) as fillet12_piece_11_section:
        with BuildLine():
            CenterArc((FILLET12_R, -FILLET12_R), FILLET12_R, 90, 90)
            Line((0, -FILLET12_R), (0, 0))
            Line((0, 0), (FILLET12_R, 0))
        make_face()
    fillet12_piece_11 = extrude(amount=33, mode=Mode.PRIVATE)
    fillet12_piece_11 = fillet12_piece_11 & Plane(origin=(5, 30, 40), x_dir=(0, 0, 1), z_dir=(0, -1, 0)) * Cylinder(7, 74, mode=Mode.PRIVATE)
    add(fillet12_piece_11)
    with BuildSketch(Plane(origin=(0, 30, 78), x_dir=(0, -1, 0), z_dir=(0, 0, -1))) as fillet12_piece_12_section:
        with BuildLine():
            CenterArc((FILLET12_R, -FILLET12_R), FILLET12_R, 90, 90)
            Line((0, -FILLET12_R), (0, 0))
            Line((0, 0), (FILLET12_R, 0))
        make_face()
    fillet12_piece_12 = extrude(amount=38, mode=Mode.PRIVATE)
    fillet12_piece_12 = split(fillet12_piece_12, bisect_by=Plane(origin=(0, 30, 45), z_dir=(0, 0, -1)), keep=Keep.TOP, mode=Mode.PRIVATE)
    fillet12_piece_12 = fillet12_piece_12 & Plane(origin=(5, 30, 40), x_dir=(0, 0, 1), z_dir=(0, -1, 0)) * Cylinder(7, 84, mode=Mode.PRIVATE)
    fillet12_piece_12 = fillet12_piece_12 - Plane(origin=(5, 30, 40), x_dir=(0, 0, 1), z_dir=(0, -1, 0)) * Cylinder(5, 84, mode=Mode.PRIVATE)
    add(fillet12_piece_12)


solid = part.part
